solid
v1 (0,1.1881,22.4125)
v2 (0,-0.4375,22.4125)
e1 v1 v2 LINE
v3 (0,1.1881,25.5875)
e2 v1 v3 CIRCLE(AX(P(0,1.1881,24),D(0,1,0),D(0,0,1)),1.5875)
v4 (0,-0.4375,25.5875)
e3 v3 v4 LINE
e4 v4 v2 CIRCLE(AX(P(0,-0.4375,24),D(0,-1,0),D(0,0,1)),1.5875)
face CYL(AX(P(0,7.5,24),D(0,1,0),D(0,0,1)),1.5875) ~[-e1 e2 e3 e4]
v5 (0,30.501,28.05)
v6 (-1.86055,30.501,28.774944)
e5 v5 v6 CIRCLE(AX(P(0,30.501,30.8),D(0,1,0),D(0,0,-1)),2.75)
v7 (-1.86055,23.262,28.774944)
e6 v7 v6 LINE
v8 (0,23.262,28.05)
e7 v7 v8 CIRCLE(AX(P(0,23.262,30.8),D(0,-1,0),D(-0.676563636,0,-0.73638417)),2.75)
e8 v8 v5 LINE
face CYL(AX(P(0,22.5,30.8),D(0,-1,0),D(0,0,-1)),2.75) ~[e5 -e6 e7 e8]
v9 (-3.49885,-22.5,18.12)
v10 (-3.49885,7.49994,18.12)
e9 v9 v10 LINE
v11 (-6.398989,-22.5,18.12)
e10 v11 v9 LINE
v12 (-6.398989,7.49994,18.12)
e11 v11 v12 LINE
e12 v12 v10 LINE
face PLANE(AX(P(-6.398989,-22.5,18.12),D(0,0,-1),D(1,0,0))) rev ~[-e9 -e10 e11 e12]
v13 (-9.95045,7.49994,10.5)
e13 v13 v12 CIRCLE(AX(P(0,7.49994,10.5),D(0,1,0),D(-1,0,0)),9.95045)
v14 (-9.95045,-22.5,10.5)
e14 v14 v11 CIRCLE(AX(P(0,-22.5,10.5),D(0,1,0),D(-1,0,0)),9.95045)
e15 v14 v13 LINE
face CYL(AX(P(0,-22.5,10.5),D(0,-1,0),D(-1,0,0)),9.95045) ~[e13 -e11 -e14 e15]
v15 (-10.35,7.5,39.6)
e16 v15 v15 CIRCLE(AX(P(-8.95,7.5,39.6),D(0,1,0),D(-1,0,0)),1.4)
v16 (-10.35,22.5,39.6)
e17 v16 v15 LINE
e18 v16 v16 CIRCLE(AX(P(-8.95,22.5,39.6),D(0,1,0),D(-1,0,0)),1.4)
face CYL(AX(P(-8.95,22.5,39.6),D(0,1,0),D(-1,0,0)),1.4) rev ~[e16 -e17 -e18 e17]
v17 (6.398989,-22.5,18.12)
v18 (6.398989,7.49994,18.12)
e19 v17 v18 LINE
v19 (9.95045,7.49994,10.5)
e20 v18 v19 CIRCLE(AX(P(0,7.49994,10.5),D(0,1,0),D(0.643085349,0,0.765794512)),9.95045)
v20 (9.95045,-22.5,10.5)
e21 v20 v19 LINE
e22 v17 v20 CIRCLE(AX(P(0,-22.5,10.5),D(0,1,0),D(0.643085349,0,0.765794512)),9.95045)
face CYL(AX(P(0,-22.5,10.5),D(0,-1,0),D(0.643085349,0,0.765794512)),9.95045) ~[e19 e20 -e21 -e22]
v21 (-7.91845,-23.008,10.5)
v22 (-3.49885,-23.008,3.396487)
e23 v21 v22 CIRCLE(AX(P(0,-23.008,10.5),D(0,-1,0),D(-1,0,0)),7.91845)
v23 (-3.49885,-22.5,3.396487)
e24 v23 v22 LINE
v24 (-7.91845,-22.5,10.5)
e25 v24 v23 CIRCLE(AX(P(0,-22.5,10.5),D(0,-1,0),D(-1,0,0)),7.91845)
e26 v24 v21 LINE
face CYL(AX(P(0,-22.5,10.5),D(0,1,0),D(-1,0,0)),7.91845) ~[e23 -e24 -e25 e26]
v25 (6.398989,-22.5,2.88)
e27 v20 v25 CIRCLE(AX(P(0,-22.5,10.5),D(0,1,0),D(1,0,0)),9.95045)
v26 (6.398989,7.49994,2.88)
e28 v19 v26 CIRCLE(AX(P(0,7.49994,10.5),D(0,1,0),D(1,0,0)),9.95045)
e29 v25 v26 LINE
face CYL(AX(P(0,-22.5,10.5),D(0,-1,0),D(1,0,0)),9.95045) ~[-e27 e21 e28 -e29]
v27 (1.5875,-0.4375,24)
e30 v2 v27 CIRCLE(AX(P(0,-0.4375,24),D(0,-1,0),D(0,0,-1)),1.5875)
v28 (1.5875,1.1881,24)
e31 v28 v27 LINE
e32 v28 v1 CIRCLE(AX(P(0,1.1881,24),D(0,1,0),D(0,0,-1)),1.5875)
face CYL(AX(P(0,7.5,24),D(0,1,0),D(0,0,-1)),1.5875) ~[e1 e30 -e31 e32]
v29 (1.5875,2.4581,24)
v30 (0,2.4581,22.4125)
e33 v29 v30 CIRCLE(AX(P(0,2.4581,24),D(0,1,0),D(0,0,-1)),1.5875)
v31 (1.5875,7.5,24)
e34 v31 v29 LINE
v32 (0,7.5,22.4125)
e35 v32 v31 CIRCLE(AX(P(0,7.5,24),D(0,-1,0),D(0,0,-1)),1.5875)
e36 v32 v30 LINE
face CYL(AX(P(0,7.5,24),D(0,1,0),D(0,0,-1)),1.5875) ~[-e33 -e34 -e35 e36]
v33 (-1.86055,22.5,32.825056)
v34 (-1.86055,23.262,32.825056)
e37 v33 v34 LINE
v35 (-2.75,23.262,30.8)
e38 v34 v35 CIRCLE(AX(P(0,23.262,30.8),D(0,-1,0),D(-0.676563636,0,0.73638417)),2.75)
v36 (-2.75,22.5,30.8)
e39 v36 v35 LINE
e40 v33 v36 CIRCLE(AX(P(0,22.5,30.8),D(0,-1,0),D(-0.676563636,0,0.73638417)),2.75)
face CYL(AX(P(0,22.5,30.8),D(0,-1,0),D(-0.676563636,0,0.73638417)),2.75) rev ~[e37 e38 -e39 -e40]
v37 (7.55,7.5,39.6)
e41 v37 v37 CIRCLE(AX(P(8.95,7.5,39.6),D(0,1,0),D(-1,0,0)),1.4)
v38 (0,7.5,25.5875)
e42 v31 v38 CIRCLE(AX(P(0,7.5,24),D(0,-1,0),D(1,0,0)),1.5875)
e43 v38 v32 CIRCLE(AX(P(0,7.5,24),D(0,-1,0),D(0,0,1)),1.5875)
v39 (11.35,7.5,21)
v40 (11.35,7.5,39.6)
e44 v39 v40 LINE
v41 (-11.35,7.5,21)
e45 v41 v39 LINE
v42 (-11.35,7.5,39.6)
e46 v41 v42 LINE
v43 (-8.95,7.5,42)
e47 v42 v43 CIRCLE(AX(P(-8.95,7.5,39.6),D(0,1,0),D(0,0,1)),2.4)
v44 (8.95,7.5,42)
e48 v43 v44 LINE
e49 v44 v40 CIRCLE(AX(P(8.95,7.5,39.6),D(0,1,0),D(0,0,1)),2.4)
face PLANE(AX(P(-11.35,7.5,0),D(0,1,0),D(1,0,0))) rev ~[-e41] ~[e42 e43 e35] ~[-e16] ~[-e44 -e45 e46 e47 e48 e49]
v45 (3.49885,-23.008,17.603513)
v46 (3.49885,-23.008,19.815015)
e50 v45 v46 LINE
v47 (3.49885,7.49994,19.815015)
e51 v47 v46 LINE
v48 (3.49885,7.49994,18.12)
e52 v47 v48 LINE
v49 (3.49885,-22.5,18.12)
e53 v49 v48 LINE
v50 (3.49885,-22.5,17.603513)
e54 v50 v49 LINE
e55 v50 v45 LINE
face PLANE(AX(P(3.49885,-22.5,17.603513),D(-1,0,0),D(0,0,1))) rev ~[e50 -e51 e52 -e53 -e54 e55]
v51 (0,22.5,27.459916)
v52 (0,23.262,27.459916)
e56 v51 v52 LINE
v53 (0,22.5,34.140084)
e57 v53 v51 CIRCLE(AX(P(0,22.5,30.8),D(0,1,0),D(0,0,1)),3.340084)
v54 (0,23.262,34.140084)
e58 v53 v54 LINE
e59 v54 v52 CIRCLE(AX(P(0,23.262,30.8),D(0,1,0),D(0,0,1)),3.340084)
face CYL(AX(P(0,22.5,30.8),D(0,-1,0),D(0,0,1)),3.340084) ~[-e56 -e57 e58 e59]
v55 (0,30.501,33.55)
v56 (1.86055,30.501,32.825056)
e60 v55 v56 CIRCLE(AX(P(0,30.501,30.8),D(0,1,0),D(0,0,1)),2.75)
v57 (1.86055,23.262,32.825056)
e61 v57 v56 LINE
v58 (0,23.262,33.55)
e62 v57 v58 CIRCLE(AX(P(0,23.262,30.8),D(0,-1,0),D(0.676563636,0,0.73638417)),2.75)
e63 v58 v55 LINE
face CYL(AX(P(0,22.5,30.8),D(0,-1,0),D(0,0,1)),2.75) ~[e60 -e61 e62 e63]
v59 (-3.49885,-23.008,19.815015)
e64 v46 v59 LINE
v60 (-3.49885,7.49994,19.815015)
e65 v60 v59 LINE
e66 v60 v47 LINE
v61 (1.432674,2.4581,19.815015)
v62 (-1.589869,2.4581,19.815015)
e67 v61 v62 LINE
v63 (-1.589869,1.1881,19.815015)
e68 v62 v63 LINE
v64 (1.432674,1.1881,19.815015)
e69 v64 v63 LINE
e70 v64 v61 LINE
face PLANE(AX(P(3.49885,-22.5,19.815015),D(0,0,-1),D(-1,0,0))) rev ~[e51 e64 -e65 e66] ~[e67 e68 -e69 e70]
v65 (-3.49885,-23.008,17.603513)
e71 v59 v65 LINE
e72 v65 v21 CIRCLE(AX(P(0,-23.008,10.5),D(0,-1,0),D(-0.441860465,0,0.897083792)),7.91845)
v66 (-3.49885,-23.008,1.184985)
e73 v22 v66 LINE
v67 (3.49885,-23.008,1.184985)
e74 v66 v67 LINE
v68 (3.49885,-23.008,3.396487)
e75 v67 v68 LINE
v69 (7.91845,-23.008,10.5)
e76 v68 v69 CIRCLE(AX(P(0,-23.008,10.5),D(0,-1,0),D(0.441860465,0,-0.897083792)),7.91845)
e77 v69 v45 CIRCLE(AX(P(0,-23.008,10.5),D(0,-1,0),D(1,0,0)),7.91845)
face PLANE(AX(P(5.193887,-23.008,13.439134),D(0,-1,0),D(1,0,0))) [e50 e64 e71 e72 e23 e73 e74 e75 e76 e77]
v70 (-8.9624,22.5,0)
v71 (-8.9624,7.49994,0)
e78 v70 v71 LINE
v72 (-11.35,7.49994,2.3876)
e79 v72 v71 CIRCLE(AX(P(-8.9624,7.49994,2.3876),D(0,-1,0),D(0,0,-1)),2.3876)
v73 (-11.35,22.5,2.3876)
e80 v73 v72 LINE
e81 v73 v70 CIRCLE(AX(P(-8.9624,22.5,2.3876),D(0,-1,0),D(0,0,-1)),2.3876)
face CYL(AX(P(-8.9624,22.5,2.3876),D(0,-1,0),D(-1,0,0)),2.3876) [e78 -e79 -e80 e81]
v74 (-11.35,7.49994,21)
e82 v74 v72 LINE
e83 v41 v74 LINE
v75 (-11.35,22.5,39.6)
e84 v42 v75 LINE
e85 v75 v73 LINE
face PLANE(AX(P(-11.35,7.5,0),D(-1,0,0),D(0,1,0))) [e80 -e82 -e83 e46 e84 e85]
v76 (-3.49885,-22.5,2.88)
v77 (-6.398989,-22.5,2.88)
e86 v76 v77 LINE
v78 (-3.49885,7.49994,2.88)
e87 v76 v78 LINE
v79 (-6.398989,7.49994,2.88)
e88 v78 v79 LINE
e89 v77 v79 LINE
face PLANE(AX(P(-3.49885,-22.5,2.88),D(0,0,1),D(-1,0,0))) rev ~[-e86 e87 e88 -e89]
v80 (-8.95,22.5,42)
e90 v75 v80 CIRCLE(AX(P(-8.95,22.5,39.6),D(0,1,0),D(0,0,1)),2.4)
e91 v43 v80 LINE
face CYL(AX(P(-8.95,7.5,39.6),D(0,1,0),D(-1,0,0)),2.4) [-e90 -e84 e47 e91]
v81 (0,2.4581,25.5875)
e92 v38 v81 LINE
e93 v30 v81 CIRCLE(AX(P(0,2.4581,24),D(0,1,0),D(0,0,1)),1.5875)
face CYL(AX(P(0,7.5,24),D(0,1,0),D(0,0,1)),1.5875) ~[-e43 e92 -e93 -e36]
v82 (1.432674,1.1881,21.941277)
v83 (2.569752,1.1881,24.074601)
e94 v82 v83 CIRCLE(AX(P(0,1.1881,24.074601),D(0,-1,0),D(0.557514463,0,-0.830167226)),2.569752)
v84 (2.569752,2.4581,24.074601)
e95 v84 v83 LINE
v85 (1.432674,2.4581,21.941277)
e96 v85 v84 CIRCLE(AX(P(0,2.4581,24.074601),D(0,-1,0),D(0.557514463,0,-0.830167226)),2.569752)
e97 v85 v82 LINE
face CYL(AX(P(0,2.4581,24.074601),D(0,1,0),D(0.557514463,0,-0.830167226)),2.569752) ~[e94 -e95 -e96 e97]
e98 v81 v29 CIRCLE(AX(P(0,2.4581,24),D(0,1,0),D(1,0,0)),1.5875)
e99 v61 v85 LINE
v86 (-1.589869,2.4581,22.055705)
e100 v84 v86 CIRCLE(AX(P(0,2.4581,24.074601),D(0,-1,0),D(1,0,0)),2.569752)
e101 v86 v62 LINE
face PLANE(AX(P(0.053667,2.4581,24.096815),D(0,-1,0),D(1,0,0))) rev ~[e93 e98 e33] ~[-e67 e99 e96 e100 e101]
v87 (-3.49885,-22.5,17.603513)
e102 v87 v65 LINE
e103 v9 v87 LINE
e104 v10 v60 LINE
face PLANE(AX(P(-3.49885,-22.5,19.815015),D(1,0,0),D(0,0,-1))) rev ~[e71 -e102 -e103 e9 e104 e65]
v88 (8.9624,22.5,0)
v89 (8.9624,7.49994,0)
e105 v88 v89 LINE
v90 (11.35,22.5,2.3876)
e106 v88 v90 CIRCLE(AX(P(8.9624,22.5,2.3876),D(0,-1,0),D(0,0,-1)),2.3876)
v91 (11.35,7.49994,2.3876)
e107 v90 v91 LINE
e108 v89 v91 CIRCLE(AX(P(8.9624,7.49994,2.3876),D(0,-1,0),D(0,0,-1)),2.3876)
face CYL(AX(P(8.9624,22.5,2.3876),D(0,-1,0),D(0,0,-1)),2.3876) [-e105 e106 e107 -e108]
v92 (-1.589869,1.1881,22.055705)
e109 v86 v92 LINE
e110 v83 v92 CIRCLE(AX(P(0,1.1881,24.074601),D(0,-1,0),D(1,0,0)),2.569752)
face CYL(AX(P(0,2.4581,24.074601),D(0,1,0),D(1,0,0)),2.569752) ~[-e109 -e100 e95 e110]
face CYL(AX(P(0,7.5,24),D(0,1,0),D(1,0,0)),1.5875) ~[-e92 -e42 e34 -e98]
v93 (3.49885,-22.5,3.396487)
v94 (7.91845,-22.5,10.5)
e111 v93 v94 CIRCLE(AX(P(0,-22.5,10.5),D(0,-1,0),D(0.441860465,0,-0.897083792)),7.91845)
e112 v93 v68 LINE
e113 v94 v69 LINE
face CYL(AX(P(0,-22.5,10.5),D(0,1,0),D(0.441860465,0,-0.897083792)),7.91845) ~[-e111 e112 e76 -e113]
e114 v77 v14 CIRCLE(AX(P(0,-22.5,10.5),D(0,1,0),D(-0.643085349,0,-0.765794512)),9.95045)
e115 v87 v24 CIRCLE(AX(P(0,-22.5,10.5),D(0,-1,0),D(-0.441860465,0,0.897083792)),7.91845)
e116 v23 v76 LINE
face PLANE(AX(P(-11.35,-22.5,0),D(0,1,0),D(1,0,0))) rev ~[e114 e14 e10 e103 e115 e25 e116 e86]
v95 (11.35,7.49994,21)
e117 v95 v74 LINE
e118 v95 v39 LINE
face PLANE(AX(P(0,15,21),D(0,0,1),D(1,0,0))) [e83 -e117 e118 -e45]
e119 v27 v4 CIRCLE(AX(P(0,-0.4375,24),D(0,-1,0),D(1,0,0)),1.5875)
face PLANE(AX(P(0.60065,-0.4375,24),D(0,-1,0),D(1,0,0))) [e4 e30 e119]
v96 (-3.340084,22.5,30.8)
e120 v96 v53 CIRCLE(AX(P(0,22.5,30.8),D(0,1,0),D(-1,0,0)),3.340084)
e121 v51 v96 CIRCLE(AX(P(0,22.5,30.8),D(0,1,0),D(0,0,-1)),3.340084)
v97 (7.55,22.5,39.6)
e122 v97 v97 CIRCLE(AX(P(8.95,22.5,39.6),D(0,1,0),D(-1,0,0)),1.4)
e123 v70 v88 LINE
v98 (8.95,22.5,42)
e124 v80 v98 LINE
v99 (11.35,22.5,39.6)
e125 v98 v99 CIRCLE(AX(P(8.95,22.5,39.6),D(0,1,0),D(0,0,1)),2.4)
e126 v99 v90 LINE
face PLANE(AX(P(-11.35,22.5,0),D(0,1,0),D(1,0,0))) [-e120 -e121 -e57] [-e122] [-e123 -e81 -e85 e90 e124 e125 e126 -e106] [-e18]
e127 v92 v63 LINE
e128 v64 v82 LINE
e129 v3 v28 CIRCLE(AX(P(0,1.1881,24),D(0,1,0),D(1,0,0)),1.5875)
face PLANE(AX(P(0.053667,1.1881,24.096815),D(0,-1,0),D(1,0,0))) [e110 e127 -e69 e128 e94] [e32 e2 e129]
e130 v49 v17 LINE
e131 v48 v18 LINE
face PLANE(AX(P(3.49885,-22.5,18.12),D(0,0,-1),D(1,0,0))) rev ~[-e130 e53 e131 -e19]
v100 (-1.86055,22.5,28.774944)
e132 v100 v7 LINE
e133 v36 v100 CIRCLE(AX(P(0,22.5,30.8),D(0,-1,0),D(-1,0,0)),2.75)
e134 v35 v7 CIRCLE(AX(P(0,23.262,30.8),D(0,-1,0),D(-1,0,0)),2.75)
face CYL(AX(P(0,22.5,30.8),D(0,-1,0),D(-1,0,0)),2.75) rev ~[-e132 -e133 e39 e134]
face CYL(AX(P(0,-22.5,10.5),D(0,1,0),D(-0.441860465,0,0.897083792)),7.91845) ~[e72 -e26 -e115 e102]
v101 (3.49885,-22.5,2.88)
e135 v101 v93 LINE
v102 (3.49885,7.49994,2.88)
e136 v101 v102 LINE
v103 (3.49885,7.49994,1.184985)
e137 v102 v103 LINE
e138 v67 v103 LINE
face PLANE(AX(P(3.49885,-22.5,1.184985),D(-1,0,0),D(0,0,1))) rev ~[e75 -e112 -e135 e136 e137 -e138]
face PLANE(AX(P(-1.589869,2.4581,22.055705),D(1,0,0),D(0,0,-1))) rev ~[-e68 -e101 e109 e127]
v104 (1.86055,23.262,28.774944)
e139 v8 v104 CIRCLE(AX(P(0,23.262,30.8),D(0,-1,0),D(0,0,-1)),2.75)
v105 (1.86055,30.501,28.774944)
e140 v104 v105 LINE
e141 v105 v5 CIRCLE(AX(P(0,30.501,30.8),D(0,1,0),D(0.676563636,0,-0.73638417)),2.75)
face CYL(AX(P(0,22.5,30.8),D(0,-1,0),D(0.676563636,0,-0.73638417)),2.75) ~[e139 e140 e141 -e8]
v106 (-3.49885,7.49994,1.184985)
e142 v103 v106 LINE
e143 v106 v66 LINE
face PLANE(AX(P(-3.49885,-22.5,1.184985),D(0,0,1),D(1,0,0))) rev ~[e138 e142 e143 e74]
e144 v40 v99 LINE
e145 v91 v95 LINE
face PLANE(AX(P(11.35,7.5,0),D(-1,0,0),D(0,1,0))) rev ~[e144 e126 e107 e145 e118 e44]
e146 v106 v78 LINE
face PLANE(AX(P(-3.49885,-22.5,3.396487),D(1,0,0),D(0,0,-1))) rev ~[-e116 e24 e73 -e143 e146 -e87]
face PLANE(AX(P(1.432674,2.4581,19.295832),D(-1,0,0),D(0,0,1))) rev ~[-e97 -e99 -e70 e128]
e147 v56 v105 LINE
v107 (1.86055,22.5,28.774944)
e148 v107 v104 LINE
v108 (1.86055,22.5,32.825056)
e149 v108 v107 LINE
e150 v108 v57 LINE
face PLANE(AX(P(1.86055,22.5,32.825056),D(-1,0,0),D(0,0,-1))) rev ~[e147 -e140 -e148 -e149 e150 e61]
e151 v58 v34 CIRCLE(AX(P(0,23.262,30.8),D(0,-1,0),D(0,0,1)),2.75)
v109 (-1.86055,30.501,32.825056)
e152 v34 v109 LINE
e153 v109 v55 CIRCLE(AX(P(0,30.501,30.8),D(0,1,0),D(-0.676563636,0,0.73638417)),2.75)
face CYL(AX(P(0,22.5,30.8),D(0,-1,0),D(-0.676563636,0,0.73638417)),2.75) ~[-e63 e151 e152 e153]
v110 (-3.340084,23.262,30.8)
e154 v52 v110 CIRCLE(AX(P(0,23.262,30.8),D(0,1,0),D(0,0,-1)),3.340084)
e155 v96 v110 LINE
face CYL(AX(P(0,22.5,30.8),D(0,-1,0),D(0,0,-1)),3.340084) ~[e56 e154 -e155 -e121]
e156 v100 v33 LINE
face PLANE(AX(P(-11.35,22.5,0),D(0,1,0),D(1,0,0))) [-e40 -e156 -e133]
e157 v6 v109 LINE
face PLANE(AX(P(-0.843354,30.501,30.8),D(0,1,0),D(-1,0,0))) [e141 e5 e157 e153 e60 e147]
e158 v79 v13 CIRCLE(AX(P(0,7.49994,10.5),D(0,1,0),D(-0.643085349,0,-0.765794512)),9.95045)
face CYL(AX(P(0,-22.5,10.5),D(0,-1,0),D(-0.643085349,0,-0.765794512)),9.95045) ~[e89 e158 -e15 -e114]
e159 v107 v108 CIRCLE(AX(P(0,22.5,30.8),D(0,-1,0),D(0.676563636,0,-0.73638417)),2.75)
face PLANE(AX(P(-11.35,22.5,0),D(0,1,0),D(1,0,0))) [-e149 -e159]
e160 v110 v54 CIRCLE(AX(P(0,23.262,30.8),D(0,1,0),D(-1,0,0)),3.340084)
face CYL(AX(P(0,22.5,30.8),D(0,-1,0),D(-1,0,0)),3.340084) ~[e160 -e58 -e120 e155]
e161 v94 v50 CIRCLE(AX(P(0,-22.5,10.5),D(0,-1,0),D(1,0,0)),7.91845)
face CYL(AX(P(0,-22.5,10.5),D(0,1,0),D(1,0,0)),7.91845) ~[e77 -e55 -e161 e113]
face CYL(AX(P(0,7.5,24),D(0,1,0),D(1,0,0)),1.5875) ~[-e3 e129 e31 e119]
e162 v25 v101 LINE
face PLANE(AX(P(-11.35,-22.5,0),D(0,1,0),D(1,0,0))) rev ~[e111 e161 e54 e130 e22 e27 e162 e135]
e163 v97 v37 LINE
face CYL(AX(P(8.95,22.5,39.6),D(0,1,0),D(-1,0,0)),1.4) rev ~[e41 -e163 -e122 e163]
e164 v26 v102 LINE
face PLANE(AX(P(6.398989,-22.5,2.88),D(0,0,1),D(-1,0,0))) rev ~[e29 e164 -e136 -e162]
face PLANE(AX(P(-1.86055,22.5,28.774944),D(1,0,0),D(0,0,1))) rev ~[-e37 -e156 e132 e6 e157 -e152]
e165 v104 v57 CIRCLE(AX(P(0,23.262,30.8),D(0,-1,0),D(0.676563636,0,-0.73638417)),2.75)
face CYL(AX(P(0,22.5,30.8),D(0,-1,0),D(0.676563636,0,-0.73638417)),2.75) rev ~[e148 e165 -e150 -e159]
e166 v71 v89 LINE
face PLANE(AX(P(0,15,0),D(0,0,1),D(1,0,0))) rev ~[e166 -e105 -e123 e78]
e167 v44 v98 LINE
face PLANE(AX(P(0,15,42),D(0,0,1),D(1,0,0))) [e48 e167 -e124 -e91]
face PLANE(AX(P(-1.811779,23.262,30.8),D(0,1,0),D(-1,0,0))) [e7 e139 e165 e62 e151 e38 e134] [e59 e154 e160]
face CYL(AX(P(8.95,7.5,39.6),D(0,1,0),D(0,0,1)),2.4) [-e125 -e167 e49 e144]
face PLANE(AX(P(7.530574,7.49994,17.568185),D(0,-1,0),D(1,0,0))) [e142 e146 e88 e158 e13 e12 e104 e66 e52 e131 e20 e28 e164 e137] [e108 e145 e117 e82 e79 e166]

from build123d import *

# Parameters (mm, degrees)
F0_W      = 22.7
F0_H      = 15
F1_DEPTH  = 42
F0_H_2    = 30
F2_DEPTH  = 21
F4_DEPTH  = 7.9375
F5_R      = 2.4
F8_DEPTH  = 29.99994
F11_DEPTH = 1.27
F12_R     = 2.3876
F13_DEPTH = 8.001
F14_DEPTH = 0.762
F6_R      = 1.4
F15_DEPTH = 25.4
F16_DEPTH = 0.508


# Not quite as in the source:
# - a length typed as a fraction of an inch, garbled in the dataset ("3 / 203.2 mm" for 3/8 in), is restored


with BuildPart() as f1:
    # F0 (on Top) → F1 (new body)
    with BuildSketch(Plane.XY):
        with Locations((0, 15)):
            Rectangle(F0_W, F0_H)
    extrude(amount=F1_DEPTH)

    # F0 (on Top) → F2 (join)
    with BuildSketch(Plane.XY):
        with Locations((0, 15)):
            Rectangle(F0_W, F0_H)
        with Locations((0, -7.5)):
            Rectangle(F0_W, F0_H_2)
    extrude(amount=F2_DEPTH)

    # F3 (on face) → F4 (join)
    with BuildSketch(Plane.XZ.offset(-7.5)):
        with BuildLine():
            Line((0, 25.5875), (0, 22.4125))
            ThreePointArc((0, 22.4125), (1.1225320151, 22.8774679849), (1.5875, 24))
            ThreePointArc((1.5875, 24), (1.1225320151, 25.1225320151), (0, 25.5875))
        make_face()
        with BuildLine():
            ThreePointArc((0, 25.5875), (-1.5875, 24), (0, 22.4125))
            Line((0, 22.4125), (0, 25.5875))
        make_face()
    extrude(amount=F4_DEPTH)

    # F5
    f5_edges = [f1.edges().sort_by_distance(p)[0] for p in [
        (-11.35, 15, 42),
        (11.35, 15, 42),
    ]]
    fillet(f5_edges, radius=F5_R)

    # F7 (on face) → F8 (cut)
    with BuildSketch(Plane.XZ.offset(22.5)):
        with BuildLine():
            Line((11.35, 21), (0, 21))
            Line((0, 21), (0, 20.45045))
            ThreePointArc((0, 20.45045), (1.7780416897, 20.2903024954), (3.49885, 19.8150149694))
            ThreePointArc((3.49885, 19.8150149694), (5.0209631758, 19.0907731893), (6.3989886078, 18.12))
            ThreePointArc((6.3989886078, 18.12), (9.0189875095, 14.7034889681), (9.95045, 10.5))
            Line((9.95045, 10.5), (11.35, 10.5))
            Line((11.35, 10.5), (11.35, 21))
        make_face()
        with BuildLine():
            Line((0, 20.45045), (0, 21))
            Line((0, 21), (-11.35, 21))
            Line((-11.35, 21), (-11.35, 10.5))
            Line((-11.35, 10.5), (-9.95045, 10.5))
            ThreePointArc((-9.95045, 10.5), (-9.0189875095, 14.7034889681), (-6.3989886078, 18.12))
            ThreePointArc((-6.3989886078, 18.12), (-5.0209631758, 19.0907731893), (-3.49885, 19.8150149694))
            ThreePointArc((-3.49885, 19.8150149694), (-1.7780416897, 20.2903024954), (0, 20.45045))
        make_face()
        with BuildLine():
            Line((-3.49885, 18.12), (-3.49885, 19.8150149694))
            ThreePointArc((-3.49885, 19.8150149694), (-5.0209631758, 19.0907731893), (-6.3989886078, 18.12))
            Line((-6.3989886078, 18.12), (-3.49885, 18.12))
        make_face()
        with BuildLine():
            ThreePointArc((6.3989886078, 18.12), (5.0209631758, 19.0907731893), (3.49885, 19.8150149694))
            Line((3.49885, 19.8150149694), (3.49885, 18.12))
            Line((3.49885, 18.12), (6.3989886078, 18.12))
        make_face()
        with BuildLine():
            Line((-9.95045, 10.5), (-11.35, 10.5))
            Line((-11.35, 10.5), (-11.35, 0))
            Line((-11.35, 0), (0, 0))
            Line((0, 0), (0, 0.54955))
            ThreePointArc((0, 0.54955), (-1.7780416897, 0.7096975046), (-3.49885, 1.1849850306))
            ThreePointArc((-3.49885, 1.1849850306), (-5.0209631758, 1.9092268107), (-6.3989886078, 2.88))
            ThreePointArc((-6.3989886078, 2.88), (-9.0189875095, 6.2965110319), (-9.95045, 10.5))
        make_face()
        with BuildLine():
            Line((11.35, 0), (11.35, 10.5))
            Line((11.35, 10.5), (9.95045, 10.5))
            ThreePointArc((9.95045, 10.5), (9.0189875095, 6.2965110319), (6.3989886078, 2.88))
            ThreePointArc((6.3989886078, 2.88), (5.0209631758, 1.9092268107), (3.49885, 1.1849850306))
            ThreePointArc((3.49885, 1.1849850306), (1.7780416897, 0.7096975046), (0, 0.54955))
            Line((0, 0.54955), (0, 0))
            Line((0, 0), (11.35, 0))
        make_face()
        with BuildLine():
            ThreePointArc((3.49885, 1.1849850306), (5.0209631758, 1.9092268107), (6.3989886078, 2.88))
            Line((6.3989886078, 2.88), (3.49885, 2.88))
            Line((3.49885, 2.88), (3.49885, 1.1849850306))
        make_face()
        with BuildLine():
            Line((-3.49885, 2.88), (-6.3989886078, 2.88))
            ThreePointArc((-6.3989886078, 2.88), (-5.0209631758, 1.9092268107), (-3.49885, 1.1849850306))
            Line((-3.49885, 1.1849850306), (-3.49885, 2.88))
        make_face()
        with BuildLine():
            ThreePointArc((3.49885, 19.8150149694), (1.7780416897, 20.2903024954), (0, 20.45045))
            Line((0, 20.45045), (0, 19.8150149694))
            Line((0, 19.8150149694), (3.49885, 19.8150149694))
        make_face()
        with BuildLine():
            Line((0, 19.8150149694), (0, 20.45045))
            ThreePointArc((0, 20.45045), (-1.7780416897, 20.2903024954), (-3.49885, 19.8150149694))
            Line((-3.49885, 19.8150149694), (0, 19.8150149694))
        make_face()
        with BuildLine():
            ThreePointArc((0, 0.54955), (1.7780416897, 0.7096975046), (3.49885, 1.1849850306))
            Line((3.49885, 1.1849850306), (0, 1.1849850306))
            Line((0, 1.1849850306), (0, 0.54955))
        make_face()
        with BuildLine():
            ThreePointArc((-3.49885, 1.1849850306), (-1.7780416897, 0.7096975046), (0, 0.54955))
            Line((0, 0.54955), (0, 1.1849850306))
            Line((0, 1.1849850306), (-3.49885, 1.1849850306))
        make_face()
    extrude(amount=-F8_DEPTH, mode=Mode.SUBTRACT)

    # F10 (on offset) → F11 (join)
    with BuildSketch(Plane.XZ.offset(-2.4581)):
        with BuildLine():
            ThreePointArc((1.4326738892, 21.9412771473), (2.2677347419, 22.8658808954), (2.5697519674, 24.0746010095))
            ThreePointArc((2.5697519674, 24.0746010095), (-1.1220643914, 26.3864393852), (-1.5898686834, 22.0557045923))
            Line((-1.5898686834, 22.0557045923), (-1.5898686834, 23.8072182983))
            Line((-1.5898686834, 23.8072182983), (1.4326738892, 23.8072182983))
            Line((1.4326738892, 23.8072182983), (1.4326738892, 21.9412771473))
        make_face()
        with BuildLine():
            Line((-1.5898686834, 23.8072182983), (-1.5898686834, 22.0557045923))
            ThreePointArc((-1.5898686834, 22.0557045923), (-0.0972160525, 21.5066885864), (1.4326738892, 21.9412771473))
            Line((1.4326738892, 21.9412771473), (1.4326738892, 23.8072182983))
            Line((1.4326738892, 23.8072182983), (-1.5898686834, 23.8072182983))
        make_face()
        with BuildLine():
            ThreePointArc((1.4326738892, 21.9412771473), (-0.0972160525, 21.5066885864), (-1.5898686834, 22.0557045923))
            Line((-1.5898686834, 22.0557045923), (-1.5898686834, 19.2958321422))
            Line((-1.5898686834, 19.2958321422), (1.4326738892, 19.2958321422))
            Line((1.4326738892, 19.2958321422), (1.4326738892, 21.9412771473))
        make_face()
    extrude(amount=F11_DEPTH)

    # F12
    f12_edges = [f1.edges().sort_by_distance(p)[0] for p in [
        (11.35, 14.99997, 0),
        (-11.35, 14.99997, 0),
    ]]
    fillet(f12_edges, radius=F12_R)

    # F6 (on face) → F13 (join)
    with BuildSketch(Plane(origin=(0, 22.5, 0), x_dir=(-1, 0, 0), z_dir=(0, 1, 0))):
        with BuildLine():
            ThreePointArc((1.86055, 32.8250564677), (0.9983973943, 33.3623627072), (0, 33.55))
            Line((0, 33.55), (0, 28.05))
            ThreePointArc((0, 28.05), (0.9983973943, 28.2376372928), (1.86055, 28.7749435323))
            Line((1.86055, 28.7749435323), (1.86055, 32.8250564677))
        make_face()
        with BuildLine():
            Line((0, 28.05), (0, 33.55))
            ThreePointArc((0, 33.55), (-0.9983973943, 33.3623627072), (-1.86055, 32.8250564677))
            Line((-1.86055, 32.8250564677), (-1.86055, 28.7749435323))
            ThreePointArc((-1.86055, 28.7749435323), (-0.9983973943, 28.2376372928), (0, 28.05))
        make_face()
    extrude(amount=F13_DEPTH)

    # F6 (on face) → F14 (join)
    with BuildSketch(Plane(origin=(0, 22.5, 0), x_dir=(-1, 0, 0), z_dir=(0, 1, 0))):
        with BuildLine():
            ThreePointArc((3.3400836906, 30.8), (2.3617958273, 33.1617958273), (0, 34.1400836906))
            Line((0, 34.1400836906), (0, 33.55))
            ThreePointArc((0, 33.55), (0.9983973943, 33.3623627072), (1.86055, 32.8250564677))
            ThreePointArc((1.86055, 32.8250564677), (2.5178376139, 31.9058904783), (2.75, 30.8))
            ThreePointArc((2.75, 30.8), (2.5178376139, 29.6941095217), (1.86055, 28.7749435323))
            ThreePointArc((1.86055, 28.7749435323), (0.9983973943, 28.2376372928), (0, 28.05))
            Line((0, 28.05), (0, 27.4599163094))
            ThreePointArc((0, 27.4599163094), (2.3617958273, 28.4382041727), (3.3400836906, 30.8))
        make_face()
        with BuildLine():
            Line((0, 33.55), (0, 34.1400836906))
            ThreePointArc((0, 34.1400836906), (-3.3400836906, 30.8), (0, 27.4599163094))
            Line((0, 27.4599163094), (0, 28.05))
            ThreePointArc((0, 28.05), (-0.9983973943, 28.2376372928), (-1.86055, 28.7749435323))
            ThreePointArc((-1.86055, 28.7749435323), (-2.75, 30.8), (-1.86055, 32.8250564677))
            ThreePointArc((-1.86055, 32.8250564677), (-0.9983973943, 33.3623627072), (0, 33.55))
        make_face()
    extrude(amount=F14_DEPTH)

    # F6 (on face) → F15 (cut)
    with BuildSketch(Plane(origin=(0, 22.5, 0), x_dir=(-1, 0, 0), z_dir=(0, 1, 0))):
        with Locations((-8.95, 39.6)):
            Circle(F6_R)
        with Locations((8.95, 39.6)):
            Circle(F6_R)
    extrude(amount=-F15_DEPTH, mode=Mode.SUBTRACT)

    # F7 (on face) → F16 (join)
    with BuildSketch(Plane.XZ.offset(22.5)):
        with BuildLine():
            ThreePointArc((7.91845, 10.5), (6.7233666859, 14.6830838875), (3.49885, 17.6035131505))
            Line((3.49885, 17.6035131505), (3.49885, 10.5))
            Line((3.49885, 10.5), (7.91845, 10.5))
        make_face()
        with BuildLine():
            Line((2.1534740311, 18.12), (0, 18.12))
            Line((0, 18.12), (0, 10.5))
            Line((0, 10.5), (3.49885, 10.5))
            Line((3.49885, 10.5), (3.49885, 17.6035131505))
            ThreePointArc((3.49885, 17.6035131505), (2.8379361171, 17.8924264621), (2.1534740311, 18.12))
        make_face()
        with BuildLine():
            Line((0, 10.5), (0, 18.12))
            Line((0, 18.12), (-2.1534740311, 18.12))
            ThreePointArc((-2.1534740311, 18.12), (-2.8379361171, 17.8924264621), (-3.49885, 17.6035131505))
            Line((-3.49885, 17.6035131505), (-3.49885, 10.5))
            Line((-3.49885, 10.5), (0, 10.5))
        make_face()
        with BuildLine():
            Line((-3.49885, 10.5), (-3.49885, 17.6035131505))
            ThreePointArc((-3.49885, 17.6035131505), (-6.7233666859, 14.6830838875), (-7.91845, 10.5))
            Line((-7.91845, 10.5), (-3.49885, 10.5))
        make_face()
        with BuildLine():
            Line((-3.49885, 10.5), (-7.91845, 10.5))
            ThreePointArc((-7.91845, 10.5), (-6.7233666859, 6.3169161125), (-3.49885, 3.3964868495))
            Line((-3.49885, 3.3964868495), (-3.49885, 10.5))
        make_face()
        with BuildLine():
            Line((0, 2.88), (0, 10.5))
            Line((0, 10.5), (-3.49885, 10.5))
            Line((-3.49885, 10.5), (-3.49885, 3.3964868495))
            ThreePointArc((-3.49885, 3.3964868495), (-2.8379361171, 3.1075735379), (-2.1534740311, 2.88))
            Line((-2.1534740311, 2.88), (0, 2.88))
        make_face()
        with BuildLine():
            Line((3.49885, 10.5), (0, 10.5))
            Line((0, 10.5), (0, 2.88))
            Line((0, 2.88), (2.1534740311, 2.88))
            ThreePointArc((2.1534740311, 2.88), (2.8379361171, 3.1075735379), (3.49885, 3.3964868495))
            Line((3.49885, 3.3964868495), (3.49885, 10.5))
        make_face()
        with BuildLine():
            ThreePointArc((3.49885, 3.3964868495), (6.7233666859, 6.3169161125), (7.91845, 10.5))
            Line((7.91845, 10.5), (3.49885, 10.5))
            Line((3.49885, 10.5), (3.49885, 3.3964868495))
        make_face()
        with BuildLine():
            ThreePointArc((2.1534740311, 18.12), (1.0870283811, 18.3434826258), (0, 18.41845))
            Line((0, 18.41845), (0, 18.12))
            Line((0, 18.12), (2.1534740311, 18.12))
        make_face()
        with BuildLine():
            Line((0, 18.12), (0, 18.41845))
            ThreePointArc((0, 18.41845), (-1.0870283811, 18.3434826258), (-2.1534740311, 18.12))
            Line((-2.1534740311, 18.12), (0, 18.12))
        make_face()
        with BuildLine():
            Line((2.1534740311, 2.88), (0, 2.88))
            Line((0, 2.88), (0, 2.58155))
            ThreePointArc((0, 2.58155), (1.0870283811, 2.6565173742), (2.1534740311, 2.88))
        make_face()
        with BuildLine():
            Line((0, 2.58155), (0, 2.88))
            Line((0, 2.88), (-2.1534740311, 2.88))
            ThreePointArc((-2.1534740311, 2.88), (-1.0870283811, 2.6565173742), (0, 2.58155))
        make_face()
        with BuildLine():
            Line((3.49885, 19.8150149694), (0, 19.8150149694))
            Line((0, 19.8150149694), (0, 18.41845))
            ThreePointArc((0, 18.41845), (1.0870283811, 18.3434826258), (2.1534740311, 18.12))
            Line((2.1534740311, 18.12), (3.49885, 18.12))
            Line((3.49885, 18.12), (3.49885, 19.8150149694))
        make_face()
        with BuildLine():
            Line((0, 18.41845), (0, 19.8150149694))
            Line((0, 19.8150149694), (-3.49885, 19.8150149694))
            Line((-3.49885, 19.8150149694), (-3.49885, 18.12))
            Line((-3.49885, 18.12), (-2.1534740311, 18.12))
            ThreePointArc((-2.1534740311, 18.12), (-1.0870283811, 18.3434826258), (0, 18.41845))
        make_face()
        with BuildLine():
            Line((-2.1534740311, 18.12), (-3.49885, 18.12))
            Line((-3.49885, 18.12), (-3.49885, 17.6035131505))
            ThreePointArc((-3.49885, 17.6035131505), (-2.8379361171, 17.8924264621), (-2.1534740311, 18.12))
        make_face()
        with BuildLine():
            Line((3.49885, 17.6035131505), (3.49885, 18.12))
            Line((3.49885, 18.12), (2.1534740311, 18.12))
            ThreePointArc((2.1534740311, 18.12), (2.8379361171, 17.8924264621), (3.49885, 17.6035131505))
        make_face()
        with BuildLine():
            Line((0, 1.1849850306), (3.49885, 1.1849850306))
            Line((3.49885, 1.1849850306), (3.49885, 2.88))
            Line((3.49885, 2.88), (2.1534740311, 2.88))
            ThreePointArc((2.1534740311, 2.88), (1.0870283811, 2.6565173742), (0, 2.58155))
            Line((0, 2.58155), (0, 1.1849850306))
        make_face()
        with BuildLine():
            Line((-3.49885, 2.88), (-3.49885, 1.1849850306))
            Line((-3.49885, 1.1849850306), (0, 1.1849850306))
            Line((0, 1.1849850306), (0, 2.58155))
            ThreePointArc((0, 2.58155), (-1.0870283811, 2.6565173742), (-2.1534740311, 2.88))
            Line((-2.1534740311, 2.88), (-3.49885, 2.88))
        make_face()
        with BuildLine():
            ThreePointArc((-2.1534740311, 2.88), (-2.8379361171, 3.1075735379), (-3.49885, 3.3964868495))
            Line((-3.49885, 3.3964868495), (-3.49885, 2.88))
            Line((-3.49885, 2.88), (-2.1534740311, 2.88))
        make_face()
        with BuildLine():
            Line((3.49885, 2.88), (3.49885, 3.3964868495))
            ThreePointArc((3.49885, 3.3964868495), (2.8379361171, 3.1075735379), (2.1534740311, 2.88))
            Line((2.1534740311, 2.88), (3.49885, 2.88))
        make_face()
    extrude(amount=F16_DEPTH)


solid = f1.part
